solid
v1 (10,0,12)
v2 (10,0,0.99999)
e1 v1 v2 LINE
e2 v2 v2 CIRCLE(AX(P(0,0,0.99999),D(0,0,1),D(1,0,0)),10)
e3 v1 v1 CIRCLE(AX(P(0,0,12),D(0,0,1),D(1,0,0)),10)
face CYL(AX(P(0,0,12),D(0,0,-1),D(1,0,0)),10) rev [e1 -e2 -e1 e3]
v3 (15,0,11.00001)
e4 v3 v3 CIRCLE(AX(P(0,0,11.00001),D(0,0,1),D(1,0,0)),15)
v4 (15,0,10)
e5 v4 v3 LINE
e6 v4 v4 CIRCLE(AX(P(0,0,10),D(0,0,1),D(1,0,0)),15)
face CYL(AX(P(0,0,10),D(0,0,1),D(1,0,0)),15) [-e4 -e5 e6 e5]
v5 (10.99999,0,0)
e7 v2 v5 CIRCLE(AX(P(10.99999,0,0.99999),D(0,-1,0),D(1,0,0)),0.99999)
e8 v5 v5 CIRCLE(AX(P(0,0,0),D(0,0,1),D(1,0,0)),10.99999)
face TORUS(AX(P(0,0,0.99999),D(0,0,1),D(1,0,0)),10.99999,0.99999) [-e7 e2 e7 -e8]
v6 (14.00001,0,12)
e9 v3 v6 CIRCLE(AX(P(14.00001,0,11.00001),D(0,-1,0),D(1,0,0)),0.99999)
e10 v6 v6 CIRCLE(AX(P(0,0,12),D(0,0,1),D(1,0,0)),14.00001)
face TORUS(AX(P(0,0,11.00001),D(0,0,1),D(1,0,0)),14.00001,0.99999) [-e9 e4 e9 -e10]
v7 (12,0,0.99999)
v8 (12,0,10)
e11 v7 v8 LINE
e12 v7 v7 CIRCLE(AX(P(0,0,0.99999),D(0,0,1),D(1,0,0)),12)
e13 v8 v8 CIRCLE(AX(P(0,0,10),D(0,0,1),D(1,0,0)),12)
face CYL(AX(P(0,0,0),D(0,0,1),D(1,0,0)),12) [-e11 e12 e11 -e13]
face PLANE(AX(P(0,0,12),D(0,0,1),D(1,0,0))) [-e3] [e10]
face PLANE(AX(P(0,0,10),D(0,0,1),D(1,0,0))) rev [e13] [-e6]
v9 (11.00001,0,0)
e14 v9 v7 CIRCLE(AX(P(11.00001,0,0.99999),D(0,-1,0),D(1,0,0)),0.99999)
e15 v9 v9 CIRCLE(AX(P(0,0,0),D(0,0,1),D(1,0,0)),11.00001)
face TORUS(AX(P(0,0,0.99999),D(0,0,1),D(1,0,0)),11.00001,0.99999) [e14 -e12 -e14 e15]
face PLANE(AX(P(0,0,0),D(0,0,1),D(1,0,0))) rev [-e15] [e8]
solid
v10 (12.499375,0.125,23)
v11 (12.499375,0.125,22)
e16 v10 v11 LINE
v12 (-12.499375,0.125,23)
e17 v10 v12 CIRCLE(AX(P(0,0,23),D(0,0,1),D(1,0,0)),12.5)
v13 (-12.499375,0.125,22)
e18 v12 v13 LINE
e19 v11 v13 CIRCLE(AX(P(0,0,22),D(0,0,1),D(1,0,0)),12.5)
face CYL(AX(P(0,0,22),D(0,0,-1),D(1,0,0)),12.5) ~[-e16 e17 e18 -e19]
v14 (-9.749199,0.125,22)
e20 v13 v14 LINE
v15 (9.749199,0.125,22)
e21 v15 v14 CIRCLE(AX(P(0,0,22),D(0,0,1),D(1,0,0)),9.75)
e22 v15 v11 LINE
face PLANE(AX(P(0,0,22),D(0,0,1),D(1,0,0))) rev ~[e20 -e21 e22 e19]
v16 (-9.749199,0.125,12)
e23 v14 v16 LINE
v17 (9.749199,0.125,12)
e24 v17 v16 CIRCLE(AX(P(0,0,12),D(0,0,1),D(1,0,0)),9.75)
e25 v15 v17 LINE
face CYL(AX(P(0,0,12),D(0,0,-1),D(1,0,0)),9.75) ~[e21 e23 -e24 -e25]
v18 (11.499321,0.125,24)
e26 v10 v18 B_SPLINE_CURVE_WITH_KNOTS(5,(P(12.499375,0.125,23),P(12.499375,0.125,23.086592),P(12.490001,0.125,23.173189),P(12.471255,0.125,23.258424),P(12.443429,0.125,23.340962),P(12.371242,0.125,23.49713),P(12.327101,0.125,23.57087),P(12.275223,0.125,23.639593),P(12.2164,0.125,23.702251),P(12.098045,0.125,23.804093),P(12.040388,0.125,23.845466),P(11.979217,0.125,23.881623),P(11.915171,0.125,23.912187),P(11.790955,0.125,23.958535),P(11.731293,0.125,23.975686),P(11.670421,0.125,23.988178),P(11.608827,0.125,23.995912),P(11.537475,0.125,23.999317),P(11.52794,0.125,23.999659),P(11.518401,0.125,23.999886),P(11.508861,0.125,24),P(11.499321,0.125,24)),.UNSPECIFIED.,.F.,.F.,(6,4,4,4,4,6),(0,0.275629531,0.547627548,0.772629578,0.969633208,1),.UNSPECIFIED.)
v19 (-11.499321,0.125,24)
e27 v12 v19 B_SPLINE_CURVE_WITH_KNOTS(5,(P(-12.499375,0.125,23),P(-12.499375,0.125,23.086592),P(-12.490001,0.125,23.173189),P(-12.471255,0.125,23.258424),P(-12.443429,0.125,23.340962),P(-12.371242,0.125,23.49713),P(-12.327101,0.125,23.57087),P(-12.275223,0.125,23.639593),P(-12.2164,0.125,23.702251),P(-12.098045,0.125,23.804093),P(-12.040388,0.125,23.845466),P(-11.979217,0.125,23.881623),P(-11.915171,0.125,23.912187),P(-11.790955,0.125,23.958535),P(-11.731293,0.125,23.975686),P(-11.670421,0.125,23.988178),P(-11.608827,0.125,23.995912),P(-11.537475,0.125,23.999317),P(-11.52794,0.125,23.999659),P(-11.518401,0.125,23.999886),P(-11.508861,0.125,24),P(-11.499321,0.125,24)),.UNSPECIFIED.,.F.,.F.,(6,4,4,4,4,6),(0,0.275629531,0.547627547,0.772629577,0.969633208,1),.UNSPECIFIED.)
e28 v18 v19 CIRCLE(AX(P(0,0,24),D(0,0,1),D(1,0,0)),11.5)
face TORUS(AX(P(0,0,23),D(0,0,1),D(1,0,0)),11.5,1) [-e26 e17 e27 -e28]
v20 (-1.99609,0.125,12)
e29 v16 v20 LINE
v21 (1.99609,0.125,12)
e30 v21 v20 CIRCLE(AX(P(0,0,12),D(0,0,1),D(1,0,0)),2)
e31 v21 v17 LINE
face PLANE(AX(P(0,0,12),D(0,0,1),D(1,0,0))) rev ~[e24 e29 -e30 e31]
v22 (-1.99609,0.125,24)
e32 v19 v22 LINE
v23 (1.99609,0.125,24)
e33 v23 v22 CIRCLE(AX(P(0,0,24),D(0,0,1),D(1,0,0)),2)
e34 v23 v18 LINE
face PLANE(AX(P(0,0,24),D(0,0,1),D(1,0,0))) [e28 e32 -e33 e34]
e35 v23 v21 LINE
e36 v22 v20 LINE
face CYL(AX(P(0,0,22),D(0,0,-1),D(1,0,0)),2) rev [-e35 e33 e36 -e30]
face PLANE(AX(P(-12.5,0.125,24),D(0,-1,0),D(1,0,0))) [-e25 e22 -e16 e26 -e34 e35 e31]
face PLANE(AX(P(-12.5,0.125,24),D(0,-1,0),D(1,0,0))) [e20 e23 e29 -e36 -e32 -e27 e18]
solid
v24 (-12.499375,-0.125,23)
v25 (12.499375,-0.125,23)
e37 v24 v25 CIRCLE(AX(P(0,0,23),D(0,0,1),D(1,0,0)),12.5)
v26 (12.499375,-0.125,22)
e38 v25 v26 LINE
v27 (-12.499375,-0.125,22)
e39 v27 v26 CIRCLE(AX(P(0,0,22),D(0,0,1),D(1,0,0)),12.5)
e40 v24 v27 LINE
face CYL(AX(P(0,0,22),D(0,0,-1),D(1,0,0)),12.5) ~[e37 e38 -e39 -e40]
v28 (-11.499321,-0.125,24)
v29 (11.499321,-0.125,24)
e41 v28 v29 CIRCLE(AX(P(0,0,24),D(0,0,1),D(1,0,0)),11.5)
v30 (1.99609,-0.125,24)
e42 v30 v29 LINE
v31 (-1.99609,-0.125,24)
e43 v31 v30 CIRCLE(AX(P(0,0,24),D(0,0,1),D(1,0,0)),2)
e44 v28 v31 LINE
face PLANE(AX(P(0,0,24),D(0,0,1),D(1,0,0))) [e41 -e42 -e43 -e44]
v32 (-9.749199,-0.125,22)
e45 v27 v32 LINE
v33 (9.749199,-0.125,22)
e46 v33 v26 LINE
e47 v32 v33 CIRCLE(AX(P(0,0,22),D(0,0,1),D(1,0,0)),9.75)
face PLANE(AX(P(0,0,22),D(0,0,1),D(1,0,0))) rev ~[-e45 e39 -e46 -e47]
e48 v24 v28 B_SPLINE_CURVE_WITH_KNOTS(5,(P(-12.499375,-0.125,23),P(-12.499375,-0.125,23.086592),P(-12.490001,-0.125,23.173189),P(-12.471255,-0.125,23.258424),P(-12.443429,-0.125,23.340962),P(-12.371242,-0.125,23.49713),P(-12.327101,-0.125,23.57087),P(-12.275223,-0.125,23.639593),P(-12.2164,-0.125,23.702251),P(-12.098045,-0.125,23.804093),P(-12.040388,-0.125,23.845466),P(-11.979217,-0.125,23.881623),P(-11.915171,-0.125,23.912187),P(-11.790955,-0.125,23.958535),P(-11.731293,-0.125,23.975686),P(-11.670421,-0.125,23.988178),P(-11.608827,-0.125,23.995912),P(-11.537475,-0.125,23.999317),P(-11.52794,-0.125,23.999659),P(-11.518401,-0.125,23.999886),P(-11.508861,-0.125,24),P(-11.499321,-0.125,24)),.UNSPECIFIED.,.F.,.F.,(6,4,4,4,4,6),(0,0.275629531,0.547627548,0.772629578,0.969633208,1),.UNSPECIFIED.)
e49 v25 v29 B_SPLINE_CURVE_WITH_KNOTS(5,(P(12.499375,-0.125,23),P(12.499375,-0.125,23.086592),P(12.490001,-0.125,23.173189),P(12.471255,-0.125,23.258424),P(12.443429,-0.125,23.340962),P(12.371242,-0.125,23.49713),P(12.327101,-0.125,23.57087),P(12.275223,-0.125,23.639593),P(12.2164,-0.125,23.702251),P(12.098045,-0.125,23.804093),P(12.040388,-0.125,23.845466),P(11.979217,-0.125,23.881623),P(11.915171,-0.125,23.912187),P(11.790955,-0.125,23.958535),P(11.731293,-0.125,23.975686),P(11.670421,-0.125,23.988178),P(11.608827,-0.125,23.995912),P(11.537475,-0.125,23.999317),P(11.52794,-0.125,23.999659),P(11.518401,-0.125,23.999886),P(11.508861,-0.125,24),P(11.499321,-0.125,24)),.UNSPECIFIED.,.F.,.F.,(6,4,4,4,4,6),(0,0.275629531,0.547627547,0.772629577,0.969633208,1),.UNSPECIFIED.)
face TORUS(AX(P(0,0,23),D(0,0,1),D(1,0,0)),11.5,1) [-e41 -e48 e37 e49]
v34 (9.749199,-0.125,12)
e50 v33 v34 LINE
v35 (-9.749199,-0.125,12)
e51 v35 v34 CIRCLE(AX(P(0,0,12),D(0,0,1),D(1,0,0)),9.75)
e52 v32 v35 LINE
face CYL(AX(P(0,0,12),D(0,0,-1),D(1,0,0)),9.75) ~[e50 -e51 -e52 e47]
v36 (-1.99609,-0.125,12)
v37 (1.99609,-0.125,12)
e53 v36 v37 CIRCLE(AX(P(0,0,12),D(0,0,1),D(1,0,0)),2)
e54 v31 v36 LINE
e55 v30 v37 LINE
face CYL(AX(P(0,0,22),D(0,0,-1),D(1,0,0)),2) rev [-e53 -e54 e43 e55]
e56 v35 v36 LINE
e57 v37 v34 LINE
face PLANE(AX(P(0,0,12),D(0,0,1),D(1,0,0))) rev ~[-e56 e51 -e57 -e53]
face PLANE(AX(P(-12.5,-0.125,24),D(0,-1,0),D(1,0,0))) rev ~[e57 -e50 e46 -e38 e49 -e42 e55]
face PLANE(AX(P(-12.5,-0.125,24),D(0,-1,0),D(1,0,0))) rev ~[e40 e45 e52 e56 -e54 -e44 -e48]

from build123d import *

# Parameters (mm, degrees)
F2_R     = 0.99999
F3_R     = 9.75
F3_R_2   = 2
F4_DEPTH = 10
F5_R     = 12.5
F5_R_2   = 2
F6_DEPTH = 2
F7_R     = 1
F8_W     = 25
F8_H     = 0.25
F9_DEPTH = 12


# Not quite as in the source:
# - a fillet or chamfer is up to 0.001 mm smaller than in the source, because OpenCascade refuses the exact size
# - a feature names something its author has since deleted; it is built from what else it names


with BuildPart() as f1:
    # F0 (on Front) → F1 (revolve)
    with BuildSketch(Plane.XZ):
        Polygon((10, 12), (10, 0), (12, 0), (12, 10), (15, 10), (15, 12), align=None)
    revolve(axis=Axis((0, 0, 14.2161818221), (0, 0, 1)))

    # F2 (radius 1 in the source; OpenCascade refuses exactly that, so slightly less here)
    f2_edges = [f1.edges().sort_by_distance(p)[0] for p in [
        (-10, 0, 0),
        (-12, 0, 0),
        (-15, 0, 12),
    ]]
    fillet(f2_edges, radius=F2_R)


with BuildPart() as f4:
    # F3 (on face) → F4 (new body)
    with BuildSketch(Plane.XY.offset(12)):
        Circle(F3_R)
        Circle(F3_R_2, mode=Mode.SUBTRACT)
    extrude(amount=F4_DEPTH)

    # F5 (on face) → F6 (join)
    with BuildSketch(Plane.XY.offset(22)):
        Circle(F5_R)
        Circle(F5_R_2, mode=Mode.SUBTRACT)
    extrude(amount=F6_DEPTH)

    # F7
    f7_edges = [f4.edges().sort_by_distance(p)[0] for p in [
        (-12.5, 0, 24),
    ]]
    fillet(f7_edges, radius=F7_R)

    # F8 (on face) → F9 (cut, through all)
    with BuildSketch(Plane.XY.offset(24)):
        Rectangle(F8_W, F8_H)
    extrude(amount=-F9_DEPTH, mode=Mode.SUBTRACT)


solid = Compound([f1.part, f4.part])
